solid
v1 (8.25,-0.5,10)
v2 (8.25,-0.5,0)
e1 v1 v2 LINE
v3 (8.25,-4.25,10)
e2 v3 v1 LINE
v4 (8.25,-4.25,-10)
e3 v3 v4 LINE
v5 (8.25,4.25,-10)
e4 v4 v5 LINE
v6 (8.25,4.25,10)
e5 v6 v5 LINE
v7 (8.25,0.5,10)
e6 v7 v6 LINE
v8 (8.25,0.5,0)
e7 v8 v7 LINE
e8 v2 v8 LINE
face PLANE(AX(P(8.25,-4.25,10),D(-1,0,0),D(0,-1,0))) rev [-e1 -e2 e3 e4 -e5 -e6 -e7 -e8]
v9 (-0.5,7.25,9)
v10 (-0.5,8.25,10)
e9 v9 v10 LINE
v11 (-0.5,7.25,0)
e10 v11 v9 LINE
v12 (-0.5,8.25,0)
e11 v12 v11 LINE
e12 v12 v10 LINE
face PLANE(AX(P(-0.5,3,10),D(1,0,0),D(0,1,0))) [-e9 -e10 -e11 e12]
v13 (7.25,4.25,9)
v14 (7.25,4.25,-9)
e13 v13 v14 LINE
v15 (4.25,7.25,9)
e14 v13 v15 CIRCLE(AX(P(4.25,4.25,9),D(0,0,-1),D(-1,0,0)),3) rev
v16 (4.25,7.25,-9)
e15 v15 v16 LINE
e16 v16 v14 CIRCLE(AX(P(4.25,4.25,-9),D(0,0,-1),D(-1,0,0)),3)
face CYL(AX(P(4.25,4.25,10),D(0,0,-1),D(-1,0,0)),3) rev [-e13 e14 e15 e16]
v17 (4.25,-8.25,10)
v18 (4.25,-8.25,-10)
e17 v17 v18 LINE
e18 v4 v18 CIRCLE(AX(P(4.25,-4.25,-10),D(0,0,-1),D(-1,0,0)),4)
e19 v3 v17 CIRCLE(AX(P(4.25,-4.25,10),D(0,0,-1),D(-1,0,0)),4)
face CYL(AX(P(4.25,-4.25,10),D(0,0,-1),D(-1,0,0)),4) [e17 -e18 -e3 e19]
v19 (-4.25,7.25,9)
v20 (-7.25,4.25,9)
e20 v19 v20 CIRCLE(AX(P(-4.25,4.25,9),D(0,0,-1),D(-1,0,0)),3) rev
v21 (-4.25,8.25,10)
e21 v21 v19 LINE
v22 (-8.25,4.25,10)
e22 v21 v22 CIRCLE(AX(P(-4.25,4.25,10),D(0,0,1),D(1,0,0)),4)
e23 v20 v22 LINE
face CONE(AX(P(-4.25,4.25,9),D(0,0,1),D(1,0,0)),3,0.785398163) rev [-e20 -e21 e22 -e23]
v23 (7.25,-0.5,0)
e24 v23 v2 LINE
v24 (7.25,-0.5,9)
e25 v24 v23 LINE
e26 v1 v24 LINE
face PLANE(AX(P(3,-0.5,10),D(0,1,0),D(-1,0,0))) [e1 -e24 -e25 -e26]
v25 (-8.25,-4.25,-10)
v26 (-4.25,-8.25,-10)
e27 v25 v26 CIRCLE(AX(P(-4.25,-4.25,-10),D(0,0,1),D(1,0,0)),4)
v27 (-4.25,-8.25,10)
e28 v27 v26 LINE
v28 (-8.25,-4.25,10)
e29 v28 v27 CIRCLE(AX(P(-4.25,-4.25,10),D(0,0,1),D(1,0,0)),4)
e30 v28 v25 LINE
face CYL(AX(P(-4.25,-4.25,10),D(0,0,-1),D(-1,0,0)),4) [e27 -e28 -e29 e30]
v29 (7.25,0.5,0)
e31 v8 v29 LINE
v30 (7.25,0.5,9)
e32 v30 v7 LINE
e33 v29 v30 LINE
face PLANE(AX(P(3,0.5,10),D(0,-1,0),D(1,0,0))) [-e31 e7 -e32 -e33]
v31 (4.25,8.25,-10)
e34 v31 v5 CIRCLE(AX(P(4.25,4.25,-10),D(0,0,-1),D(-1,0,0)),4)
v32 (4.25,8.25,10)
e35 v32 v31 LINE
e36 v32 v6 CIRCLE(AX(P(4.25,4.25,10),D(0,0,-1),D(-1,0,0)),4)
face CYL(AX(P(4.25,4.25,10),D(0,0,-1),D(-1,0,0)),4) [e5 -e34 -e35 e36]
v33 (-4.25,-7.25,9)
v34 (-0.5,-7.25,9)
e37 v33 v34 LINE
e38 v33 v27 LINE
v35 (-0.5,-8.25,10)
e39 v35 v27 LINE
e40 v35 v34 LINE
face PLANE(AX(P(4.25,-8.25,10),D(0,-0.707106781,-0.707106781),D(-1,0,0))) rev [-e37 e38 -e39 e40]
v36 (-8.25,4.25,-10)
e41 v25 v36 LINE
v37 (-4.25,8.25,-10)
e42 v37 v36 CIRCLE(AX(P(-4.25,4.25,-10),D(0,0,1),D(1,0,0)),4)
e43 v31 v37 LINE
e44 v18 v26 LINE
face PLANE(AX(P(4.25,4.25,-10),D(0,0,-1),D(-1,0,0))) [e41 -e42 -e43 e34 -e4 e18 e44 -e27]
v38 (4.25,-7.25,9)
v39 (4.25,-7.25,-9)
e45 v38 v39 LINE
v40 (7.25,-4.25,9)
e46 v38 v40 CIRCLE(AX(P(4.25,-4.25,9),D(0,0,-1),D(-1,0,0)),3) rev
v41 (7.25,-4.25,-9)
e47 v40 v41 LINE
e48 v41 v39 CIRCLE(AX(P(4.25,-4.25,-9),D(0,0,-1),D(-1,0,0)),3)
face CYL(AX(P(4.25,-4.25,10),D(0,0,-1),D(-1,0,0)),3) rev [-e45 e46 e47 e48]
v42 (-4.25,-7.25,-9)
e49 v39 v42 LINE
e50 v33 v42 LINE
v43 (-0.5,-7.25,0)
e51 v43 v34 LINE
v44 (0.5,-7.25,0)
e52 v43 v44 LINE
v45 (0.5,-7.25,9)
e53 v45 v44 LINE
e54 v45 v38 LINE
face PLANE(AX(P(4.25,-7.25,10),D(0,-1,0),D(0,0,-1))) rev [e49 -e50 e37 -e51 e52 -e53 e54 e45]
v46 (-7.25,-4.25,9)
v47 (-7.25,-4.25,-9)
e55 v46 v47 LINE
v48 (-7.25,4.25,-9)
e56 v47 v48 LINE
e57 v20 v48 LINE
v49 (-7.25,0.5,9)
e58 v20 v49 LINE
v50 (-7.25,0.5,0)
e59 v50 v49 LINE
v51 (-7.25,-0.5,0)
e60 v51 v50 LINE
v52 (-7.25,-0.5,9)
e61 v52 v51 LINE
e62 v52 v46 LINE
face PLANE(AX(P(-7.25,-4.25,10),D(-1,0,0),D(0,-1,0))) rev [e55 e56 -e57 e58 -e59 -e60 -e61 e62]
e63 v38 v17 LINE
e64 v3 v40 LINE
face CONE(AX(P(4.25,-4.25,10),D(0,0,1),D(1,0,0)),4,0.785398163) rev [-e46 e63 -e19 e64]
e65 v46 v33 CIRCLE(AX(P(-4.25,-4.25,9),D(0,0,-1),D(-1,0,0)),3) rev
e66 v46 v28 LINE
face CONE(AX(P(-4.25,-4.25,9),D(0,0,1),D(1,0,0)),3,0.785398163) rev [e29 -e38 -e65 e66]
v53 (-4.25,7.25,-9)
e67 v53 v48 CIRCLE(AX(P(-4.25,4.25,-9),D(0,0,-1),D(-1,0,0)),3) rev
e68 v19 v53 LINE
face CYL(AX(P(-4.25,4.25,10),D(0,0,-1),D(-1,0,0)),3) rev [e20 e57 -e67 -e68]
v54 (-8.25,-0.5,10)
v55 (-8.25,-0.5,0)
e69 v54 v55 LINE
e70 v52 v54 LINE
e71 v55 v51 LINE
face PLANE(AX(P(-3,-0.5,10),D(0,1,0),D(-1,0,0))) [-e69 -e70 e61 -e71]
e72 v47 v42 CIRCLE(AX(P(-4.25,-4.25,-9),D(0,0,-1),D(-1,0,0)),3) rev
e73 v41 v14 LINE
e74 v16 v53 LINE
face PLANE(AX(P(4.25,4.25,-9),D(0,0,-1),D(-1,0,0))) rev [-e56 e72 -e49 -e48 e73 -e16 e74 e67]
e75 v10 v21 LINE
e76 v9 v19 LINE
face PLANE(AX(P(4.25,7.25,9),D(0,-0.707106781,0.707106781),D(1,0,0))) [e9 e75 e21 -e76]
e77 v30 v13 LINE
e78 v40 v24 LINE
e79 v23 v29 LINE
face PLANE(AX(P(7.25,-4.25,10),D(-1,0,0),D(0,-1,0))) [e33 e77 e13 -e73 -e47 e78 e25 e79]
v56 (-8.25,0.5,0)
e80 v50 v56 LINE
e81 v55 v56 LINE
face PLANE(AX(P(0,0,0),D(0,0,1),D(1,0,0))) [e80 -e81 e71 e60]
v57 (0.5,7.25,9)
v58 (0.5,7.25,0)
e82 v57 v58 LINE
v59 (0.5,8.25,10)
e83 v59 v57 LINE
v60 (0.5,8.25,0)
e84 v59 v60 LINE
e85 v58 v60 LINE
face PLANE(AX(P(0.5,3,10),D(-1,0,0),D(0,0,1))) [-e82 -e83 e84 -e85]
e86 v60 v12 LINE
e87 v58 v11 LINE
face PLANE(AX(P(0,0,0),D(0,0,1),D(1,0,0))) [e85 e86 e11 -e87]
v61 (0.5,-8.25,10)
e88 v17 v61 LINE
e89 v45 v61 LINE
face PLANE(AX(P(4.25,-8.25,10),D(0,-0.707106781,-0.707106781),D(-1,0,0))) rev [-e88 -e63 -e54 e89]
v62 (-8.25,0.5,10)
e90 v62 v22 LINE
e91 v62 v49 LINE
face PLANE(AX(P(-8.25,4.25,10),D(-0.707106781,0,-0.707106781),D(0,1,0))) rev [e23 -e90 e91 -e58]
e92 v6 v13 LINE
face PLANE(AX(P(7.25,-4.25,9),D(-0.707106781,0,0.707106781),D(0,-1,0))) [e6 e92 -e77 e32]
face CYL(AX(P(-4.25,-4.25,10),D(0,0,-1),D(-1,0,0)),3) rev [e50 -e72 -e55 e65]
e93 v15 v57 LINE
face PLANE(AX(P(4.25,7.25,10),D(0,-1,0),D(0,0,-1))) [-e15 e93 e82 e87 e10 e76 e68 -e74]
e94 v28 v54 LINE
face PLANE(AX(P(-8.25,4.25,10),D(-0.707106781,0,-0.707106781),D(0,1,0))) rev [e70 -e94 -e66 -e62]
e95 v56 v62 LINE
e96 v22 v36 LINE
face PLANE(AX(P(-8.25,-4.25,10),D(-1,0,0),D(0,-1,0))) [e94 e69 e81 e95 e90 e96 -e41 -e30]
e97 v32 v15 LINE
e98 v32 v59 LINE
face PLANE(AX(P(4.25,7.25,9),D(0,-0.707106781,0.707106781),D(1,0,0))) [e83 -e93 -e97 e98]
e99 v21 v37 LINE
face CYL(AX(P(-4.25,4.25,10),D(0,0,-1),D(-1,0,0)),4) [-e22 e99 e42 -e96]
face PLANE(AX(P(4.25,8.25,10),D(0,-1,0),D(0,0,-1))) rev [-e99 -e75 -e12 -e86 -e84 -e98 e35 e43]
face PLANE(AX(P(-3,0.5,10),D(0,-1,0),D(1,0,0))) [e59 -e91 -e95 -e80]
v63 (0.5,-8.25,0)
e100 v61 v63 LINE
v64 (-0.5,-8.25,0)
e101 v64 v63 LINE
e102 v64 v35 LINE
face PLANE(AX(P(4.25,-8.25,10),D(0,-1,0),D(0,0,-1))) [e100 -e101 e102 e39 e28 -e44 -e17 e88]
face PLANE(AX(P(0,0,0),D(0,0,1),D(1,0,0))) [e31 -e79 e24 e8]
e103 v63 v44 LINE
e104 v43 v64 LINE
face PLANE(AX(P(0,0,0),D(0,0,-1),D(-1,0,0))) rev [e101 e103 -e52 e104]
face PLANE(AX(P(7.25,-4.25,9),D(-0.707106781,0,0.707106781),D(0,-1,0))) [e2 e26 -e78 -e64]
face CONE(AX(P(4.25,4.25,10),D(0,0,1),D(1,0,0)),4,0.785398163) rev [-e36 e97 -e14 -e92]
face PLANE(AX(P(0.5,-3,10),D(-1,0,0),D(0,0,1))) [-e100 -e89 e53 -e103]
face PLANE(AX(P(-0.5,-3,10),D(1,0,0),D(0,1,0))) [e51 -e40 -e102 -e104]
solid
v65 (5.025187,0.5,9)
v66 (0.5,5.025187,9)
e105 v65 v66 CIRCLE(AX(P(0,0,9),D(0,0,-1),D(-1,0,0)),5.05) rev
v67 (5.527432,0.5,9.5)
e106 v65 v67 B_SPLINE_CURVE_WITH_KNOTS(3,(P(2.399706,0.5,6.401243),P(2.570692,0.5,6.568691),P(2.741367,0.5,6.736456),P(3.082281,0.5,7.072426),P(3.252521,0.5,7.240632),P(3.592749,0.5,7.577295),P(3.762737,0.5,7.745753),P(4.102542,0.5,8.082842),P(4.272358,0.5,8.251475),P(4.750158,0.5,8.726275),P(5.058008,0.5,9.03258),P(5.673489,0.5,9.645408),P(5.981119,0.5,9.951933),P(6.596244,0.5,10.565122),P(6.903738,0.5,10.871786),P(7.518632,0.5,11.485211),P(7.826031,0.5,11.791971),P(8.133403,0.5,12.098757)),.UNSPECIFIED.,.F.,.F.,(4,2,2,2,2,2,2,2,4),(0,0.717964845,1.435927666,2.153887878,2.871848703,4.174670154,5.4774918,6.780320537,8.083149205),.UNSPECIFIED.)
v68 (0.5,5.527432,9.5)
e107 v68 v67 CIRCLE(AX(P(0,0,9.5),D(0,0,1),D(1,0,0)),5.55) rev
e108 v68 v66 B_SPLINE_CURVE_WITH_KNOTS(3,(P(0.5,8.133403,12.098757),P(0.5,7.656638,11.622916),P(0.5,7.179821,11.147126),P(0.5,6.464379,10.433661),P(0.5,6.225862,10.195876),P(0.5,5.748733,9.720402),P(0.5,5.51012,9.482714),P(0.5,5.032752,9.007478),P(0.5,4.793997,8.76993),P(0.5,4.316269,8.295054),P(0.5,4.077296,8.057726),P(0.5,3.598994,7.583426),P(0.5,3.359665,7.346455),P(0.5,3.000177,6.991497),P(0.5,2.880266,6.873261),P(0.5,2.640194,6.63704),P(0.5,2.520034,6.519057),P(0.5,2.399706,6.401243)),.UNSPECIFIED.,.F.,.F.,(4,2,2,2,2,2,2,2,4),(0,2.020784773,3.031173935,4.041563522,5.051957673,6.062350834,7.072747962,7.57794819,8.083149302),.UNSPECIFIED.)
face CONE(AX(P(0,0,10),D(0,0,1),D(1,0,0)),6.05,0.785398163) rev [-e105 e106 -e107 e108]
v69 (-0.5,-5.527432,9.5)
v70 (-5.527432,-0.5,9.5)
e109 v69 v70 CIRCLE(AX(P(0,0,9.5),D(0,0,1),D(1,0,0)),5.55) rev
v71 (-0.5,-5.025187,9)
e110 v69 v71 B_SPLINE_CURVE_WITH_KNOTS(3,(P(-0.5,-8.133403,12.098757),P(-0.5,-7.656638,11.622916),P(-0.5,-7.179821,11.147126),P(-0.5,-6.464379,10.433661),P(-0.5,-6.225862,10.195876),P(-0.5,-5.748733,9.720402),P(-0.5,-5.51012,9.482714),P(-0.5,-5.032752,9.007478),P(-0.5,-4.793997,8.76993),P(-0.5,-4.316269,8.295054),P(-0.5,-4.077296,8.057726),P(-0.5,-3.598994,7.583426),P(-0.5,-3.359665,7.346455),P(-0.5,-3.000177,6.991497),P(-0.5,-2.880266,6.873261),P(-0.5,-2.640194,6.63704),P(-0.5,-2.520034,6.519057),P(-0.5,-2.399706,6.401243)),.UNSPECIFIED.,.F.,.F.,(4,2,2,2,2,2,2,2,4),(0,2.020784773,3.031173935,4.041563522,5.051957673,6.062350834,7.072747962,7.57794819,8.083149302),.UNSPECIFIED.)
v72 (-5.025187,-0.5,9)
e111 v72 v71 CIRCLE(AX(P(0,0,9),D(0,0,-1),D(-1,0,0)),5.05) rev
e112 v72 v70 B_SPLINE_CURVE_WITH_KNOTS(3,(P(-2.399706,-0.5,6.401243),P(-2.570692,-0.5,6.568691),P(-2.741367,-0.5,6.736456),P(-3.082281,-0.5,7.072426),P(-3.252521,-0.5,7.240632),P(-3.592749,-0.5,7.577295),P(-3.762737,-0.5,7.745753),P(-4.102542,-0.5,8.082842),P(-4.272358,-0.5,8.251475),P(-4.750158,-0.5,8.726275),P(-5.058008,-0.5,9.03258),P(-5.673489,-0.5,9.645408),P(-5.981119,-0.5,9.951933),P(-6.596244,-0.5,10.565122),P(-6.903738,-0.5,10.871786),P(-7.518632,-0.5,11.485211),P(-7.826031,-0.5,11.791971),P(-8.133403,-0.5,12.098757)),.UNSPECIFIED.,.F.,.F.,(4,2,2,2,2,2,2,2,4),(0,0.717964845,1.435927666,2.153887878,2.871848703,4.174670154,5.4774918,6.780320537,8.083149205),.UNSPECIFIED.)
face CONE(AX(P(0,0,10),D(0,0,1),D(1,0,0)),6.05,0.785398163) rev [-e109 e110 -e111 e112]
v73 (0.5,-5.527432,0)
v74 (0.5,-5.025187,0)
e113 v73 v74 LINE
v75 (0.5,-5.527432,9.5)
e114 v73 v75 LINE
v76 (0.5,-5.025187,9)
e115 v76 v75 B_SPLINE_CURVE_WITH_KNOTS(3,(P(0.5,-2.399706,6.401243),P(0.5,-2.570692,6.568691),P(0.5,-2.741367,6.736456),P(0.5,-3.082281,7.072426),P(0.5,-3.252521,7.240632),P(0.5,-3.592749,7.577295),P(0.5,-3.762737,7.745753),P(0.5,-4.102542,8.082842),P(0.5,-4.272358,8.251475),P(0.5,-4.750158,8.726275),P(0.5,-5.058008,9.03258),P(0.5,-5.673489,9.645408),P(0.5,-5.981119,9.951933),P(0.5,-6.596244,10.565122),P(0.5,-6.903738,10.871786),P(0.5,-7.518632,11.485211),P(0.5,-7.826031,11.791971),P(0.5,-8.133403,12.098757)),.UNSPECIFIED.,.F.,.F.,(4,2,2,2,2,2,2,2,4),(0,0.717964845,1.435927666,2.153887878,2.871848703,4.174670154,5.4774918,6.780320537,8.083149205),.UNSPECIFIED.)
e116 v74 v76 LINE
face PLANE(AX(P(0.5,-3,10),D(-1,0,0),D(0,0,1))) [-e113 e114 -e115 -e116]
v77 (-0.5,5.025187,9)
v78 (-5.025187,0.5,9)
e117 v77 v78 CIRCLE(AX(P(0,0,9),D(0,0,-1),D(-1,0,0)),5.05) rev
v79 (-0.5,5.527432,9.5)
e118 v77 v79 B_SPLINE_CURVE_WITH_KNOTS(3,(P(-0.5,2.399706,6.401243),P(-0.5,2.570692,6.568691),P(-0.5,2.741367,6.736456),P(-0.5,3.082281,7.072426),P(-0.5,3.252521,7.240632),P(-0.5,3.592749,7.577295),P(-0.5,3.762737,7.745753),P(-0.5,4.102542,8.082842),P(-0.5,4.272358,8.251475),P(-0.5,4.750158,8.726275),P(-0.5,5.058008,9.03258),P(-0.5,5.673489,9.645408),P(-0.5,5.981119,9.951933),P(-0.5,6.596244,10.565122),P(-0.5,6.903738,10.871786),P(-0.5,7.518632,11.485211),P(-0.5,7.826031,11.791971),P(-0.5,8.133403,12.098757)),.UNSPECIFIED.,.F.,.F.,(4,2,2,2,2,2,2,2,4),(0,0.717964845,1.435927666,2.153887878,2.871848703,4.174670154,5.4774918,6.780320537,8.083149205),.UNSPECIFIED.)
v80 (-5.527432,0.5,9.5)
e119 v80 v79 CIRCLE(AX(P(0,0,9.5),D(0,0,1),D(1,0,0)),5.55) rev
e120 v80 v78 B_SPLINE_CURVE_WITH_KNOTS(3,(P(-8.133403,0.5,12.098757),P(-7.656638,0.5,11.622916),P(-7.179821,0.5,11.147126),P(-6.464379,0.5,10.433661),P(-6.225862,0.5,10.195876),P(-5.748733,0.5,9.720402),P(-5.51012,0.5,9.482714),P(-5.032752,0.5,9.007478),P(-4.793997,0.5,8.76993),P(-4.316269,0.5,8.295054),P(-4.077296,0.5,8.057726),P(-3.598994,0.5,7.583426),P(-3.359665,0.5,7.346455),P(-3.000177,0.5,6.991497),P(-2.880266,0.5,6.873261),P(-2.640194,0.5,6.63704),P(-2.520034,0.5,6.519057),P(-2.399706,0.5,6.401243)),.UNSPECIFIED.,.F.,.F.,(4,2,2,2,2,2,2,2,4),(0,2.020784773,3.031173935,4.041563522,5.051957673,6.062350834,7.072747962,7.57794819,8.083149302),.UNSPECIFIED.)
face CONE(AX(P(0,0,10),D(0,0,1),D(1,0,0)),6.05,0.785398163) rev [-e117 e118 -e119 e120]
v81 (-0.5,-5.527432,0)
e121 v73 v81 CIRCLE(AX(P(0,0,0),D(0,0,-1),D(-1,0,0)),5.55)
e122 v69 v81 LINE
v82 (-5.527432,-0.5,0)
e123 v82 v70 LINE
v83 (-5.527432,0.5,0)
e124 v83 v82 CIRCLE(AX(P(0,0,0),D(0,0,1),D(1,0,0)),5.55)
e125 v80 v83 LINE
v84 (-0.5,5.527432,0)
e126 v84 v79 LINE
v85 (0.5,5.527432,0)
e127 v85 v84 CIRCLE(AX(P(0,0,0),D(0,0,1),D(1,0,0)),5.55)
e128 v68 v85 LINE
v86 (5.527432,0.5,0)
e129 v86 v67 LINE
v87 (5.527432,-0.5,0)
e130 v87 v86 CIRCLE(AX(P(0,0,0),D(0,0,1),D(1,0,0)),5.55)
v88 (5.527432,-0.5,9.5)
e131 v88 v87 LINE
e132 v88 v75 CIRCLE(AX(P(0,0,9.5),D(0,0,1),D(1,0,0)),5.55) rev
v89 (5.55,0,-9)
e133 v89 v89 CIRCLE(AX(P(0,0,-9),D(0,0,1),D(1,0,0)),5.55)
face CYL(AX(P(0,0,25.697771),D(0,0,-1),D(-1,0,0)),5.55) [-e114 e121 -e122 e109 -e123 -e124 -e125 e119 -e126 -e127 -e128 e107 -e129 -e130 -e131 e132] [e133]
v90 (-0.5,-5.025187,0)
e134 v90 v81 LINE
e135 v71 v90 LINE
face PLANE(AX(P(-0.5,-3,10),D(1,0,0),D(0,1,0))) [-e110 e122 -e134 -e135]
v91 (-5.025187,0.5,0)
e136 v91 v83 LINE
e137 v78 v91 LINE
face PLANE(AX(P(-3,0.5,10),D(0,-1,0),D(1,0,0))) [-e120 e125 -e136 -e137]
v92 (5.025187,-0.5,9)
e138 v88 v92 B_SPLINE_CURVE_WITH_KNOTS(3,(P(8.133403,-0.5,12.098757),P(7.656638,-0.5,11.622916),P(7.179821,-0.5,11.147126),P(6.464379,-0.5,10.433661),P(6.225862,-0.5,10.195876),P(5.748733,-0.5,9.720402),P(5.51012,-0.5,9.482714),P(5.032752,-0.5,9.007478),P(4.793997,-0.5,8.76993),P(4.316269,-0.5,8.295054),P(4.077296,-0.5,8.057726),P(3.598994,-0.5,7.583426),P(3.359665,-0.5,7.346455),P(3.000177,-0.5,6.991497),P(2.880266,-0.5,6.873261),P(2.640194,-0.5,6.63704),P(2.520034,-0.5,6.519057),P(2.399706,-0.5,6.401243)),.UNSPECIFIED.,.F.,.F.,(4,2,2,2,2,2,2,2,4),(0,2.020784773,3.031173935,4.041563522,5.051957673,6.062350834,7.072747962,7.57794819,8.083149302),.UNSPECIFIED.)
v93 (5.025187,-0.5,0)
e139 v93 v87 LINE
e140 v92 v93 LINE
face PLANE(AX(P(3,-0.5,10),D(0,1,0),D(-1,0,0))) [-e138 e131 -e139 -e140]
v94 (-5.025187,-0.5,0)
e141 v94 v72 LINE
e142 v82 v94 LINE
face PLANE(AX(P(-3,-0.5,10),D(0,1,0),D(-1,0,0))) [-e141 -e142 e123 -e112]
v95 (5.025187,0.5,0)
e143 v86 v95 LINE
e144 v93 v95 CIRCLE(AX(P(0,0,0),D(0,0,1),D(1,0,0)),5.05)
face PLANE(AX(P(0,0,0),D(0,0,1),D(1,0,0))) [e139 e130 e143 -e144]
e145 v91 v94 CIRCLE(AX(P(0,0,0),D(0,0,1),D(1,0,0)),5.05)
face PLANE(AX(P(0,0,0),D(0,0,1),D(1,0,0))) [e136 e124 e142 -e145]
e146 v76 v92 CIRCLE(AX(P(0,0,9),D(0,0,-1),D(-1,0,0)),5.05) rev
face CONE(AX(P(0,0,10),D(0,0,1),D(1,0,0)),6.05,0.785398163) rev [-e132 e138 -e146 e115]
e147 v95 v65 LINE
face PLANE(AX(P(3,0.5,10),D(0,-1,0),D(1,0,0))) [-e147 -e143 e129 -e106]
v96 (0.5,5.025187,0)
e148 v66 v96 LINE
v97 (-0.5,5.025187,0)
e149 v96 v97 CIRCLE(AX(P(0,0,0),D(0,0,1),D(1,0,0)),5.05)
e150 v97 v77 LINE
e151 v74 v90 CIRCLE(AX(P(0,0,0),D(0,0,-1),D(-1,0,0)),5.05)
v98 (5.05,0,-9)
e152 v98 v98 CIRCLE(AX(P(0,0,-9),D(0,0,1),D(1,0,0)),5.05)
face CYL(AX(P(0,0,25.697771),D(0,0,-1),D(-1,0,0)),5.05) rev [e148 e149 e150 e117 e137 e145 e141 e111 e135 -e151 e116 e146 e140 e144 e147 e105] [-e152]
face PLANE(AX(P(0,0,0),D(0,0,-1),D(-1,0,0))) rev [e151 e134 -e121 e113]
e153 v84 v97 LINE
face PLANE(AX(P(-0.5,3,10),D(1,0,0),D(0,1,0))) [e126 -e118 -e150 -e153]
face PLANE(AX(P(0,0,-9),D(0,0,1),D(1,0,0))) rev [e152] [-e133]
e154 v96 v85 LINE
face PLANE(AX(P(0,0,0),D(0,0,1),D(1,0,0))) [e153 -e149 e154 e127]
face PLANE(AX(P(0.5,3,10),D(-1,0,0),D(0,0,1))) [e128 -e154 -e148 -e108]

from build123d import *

# Parameters (mm, degrees)
BOSS_EXTRUDE1_DEPTH = 10
SHELL7_T            = -1
SKETCH4_R           = 5.55
SKETCH4_R_2         = 5.05
BOSS_EXTRUDE2_DEPTH = 19
CHAMFER2_SIZE       = 1
CHAMFER4_SIZE       = 1
SKETCH10_W          = 1
SKETCH10_H          = 10
SKETCH10_W_2        = 10
SKETCH10_H_2        = 1
CUT_EXTRUDE2_DEPTH  = 10


# Some blends are built 0.0001 mm under size
with BuildPart() as part:
    # Sketch2 → Boss-Extrude1 (new, symmetric)
    with BuildSketch(Plane.XY):
        with BuildLine():
            Line((4.25, -8.25), (-4.25, -8.25))
            ThreePointArc((-4.25, -8.25), (-7.078427125, -7.078427125), (-8.25, -4.25))
            Line((-8.25, -4.25), (-8.25, 4.25))
            ThreePointArc((-8.25, 4.25), (-7.078427125, 7.078427125), (-4.25, 8.25))
            Line((-4.25, 8.25), (4.25, 8.25))
            ThreePointArc((4.25, 8.25), (7.078427125, 7.078427125), (8.25, 4.25))
            Line((8.25, 4.25), (8.25, -4.25))
            ThreePointArc((8.25, -4.25), (7.078427125, -7.078427125), (4.25, -8.25))
        make_face()
    extrude(amount=BOSS_EXTRUDE1_DEPTH, both=True)

    # Shell7
    shell7_openings = [part.faces().sort_by_distance(p)[0] for p in [
        (0, 0, 10),
    ]]
    offset(amount=SHELL7_T, openings=shell7_openings, kind=Kind.INTERSECTION)

    # Chamfer4
    chamfer4_edges = [part.edges().sort_by_distance(p)[0] for p in [
        (6.371320344, 6.371320344, 10),
        (-7.25, 0, 10),
        (0, -7.25, 10),
        (6.371320344, -6.371320344, 10),
        (0, 7.25, 10),
        (-6.371320344, 6.371320344, 10),
        (-6.371320344, -6.371320344, 10),
        (7.25, 0, 10),
    ]]
    chamfer(chamfer4_edges, length=CHAMFER4_SIZE - 0.0001)  # a hair under: the kernel refuses the full size


with BuildPart() as body_2:
    # Sketch4 → Boss-Extrude2 (new body)
    with BuildSketch(Plane.XY.offset(-9)):
        with Locations(Location((0, 0, 0), (0, 0, 180))):
            Circle(SKETCH4_R)
        with Locations(Location((0, 0, 0), (0, 0, 180))):
            Circle(SKETCH4_R_2, mode=Mode.SUBTRACT)
    extrude(amount=BOSS_EXTRUDE2_DEPTH)

    # Chamfer2
    # the kernel refuses this chamfer: 1 mm, written as the material it takes off along each edge
    with BuildSketch(Plane(origin=(0, 0, 10), x_dir=(-1, 0, 0), z_dir=(0, 1, 0))) as chamfer2_piece_1:
        Polygon((5.05, -CHAMFER2_SIZE), (5.05 + CHAMFER2_SIZE, 0), (5.05, 0), align=None)
    revolve(axis=Axis((0, 0, 10), (0, 0, 1)), mode=Mode.SUBTRACT)


with BuildPart() as cut_extrude2_tool:
    # Sketch10 → Cut-Extrude2 (new body)
    with BuildSketch(Plane.XY):
        with Locations((0, 8)):
            Rectangle(SKETCH10_W, SKETCH10_H)
        with Locations((8, 0)):
            Rectangle(SKETCH10_W_2, SKETCH10_H_2)
        with Locations((0, -8)):
            Rectangle(SKETCH10_W, SKETCH10_H)
        with Locations((-8, 0)):
            Rectangle(SKETCH10_W_2, SKETCH10_H_2)
    extrude(amount=CUT_EXTRUDE2_DEPTH)


with BuildPart() as part_1:
    add(part.part)

    # Cut-Extrude2: cut by cut_extrude2_tool
    add(cut_extrude2_tool.part, mode=Mode.SUBTRACT)


with BuildPart() as body_2_1:
    add(body_2.part)

    # Cut-Extrude2: cut by cut_extrude2_tool
    add(cut_extrude2_tool.part, mode=Mode.SUBTRACT)


solid = Compound([part_1.part, body_2_1.part])
